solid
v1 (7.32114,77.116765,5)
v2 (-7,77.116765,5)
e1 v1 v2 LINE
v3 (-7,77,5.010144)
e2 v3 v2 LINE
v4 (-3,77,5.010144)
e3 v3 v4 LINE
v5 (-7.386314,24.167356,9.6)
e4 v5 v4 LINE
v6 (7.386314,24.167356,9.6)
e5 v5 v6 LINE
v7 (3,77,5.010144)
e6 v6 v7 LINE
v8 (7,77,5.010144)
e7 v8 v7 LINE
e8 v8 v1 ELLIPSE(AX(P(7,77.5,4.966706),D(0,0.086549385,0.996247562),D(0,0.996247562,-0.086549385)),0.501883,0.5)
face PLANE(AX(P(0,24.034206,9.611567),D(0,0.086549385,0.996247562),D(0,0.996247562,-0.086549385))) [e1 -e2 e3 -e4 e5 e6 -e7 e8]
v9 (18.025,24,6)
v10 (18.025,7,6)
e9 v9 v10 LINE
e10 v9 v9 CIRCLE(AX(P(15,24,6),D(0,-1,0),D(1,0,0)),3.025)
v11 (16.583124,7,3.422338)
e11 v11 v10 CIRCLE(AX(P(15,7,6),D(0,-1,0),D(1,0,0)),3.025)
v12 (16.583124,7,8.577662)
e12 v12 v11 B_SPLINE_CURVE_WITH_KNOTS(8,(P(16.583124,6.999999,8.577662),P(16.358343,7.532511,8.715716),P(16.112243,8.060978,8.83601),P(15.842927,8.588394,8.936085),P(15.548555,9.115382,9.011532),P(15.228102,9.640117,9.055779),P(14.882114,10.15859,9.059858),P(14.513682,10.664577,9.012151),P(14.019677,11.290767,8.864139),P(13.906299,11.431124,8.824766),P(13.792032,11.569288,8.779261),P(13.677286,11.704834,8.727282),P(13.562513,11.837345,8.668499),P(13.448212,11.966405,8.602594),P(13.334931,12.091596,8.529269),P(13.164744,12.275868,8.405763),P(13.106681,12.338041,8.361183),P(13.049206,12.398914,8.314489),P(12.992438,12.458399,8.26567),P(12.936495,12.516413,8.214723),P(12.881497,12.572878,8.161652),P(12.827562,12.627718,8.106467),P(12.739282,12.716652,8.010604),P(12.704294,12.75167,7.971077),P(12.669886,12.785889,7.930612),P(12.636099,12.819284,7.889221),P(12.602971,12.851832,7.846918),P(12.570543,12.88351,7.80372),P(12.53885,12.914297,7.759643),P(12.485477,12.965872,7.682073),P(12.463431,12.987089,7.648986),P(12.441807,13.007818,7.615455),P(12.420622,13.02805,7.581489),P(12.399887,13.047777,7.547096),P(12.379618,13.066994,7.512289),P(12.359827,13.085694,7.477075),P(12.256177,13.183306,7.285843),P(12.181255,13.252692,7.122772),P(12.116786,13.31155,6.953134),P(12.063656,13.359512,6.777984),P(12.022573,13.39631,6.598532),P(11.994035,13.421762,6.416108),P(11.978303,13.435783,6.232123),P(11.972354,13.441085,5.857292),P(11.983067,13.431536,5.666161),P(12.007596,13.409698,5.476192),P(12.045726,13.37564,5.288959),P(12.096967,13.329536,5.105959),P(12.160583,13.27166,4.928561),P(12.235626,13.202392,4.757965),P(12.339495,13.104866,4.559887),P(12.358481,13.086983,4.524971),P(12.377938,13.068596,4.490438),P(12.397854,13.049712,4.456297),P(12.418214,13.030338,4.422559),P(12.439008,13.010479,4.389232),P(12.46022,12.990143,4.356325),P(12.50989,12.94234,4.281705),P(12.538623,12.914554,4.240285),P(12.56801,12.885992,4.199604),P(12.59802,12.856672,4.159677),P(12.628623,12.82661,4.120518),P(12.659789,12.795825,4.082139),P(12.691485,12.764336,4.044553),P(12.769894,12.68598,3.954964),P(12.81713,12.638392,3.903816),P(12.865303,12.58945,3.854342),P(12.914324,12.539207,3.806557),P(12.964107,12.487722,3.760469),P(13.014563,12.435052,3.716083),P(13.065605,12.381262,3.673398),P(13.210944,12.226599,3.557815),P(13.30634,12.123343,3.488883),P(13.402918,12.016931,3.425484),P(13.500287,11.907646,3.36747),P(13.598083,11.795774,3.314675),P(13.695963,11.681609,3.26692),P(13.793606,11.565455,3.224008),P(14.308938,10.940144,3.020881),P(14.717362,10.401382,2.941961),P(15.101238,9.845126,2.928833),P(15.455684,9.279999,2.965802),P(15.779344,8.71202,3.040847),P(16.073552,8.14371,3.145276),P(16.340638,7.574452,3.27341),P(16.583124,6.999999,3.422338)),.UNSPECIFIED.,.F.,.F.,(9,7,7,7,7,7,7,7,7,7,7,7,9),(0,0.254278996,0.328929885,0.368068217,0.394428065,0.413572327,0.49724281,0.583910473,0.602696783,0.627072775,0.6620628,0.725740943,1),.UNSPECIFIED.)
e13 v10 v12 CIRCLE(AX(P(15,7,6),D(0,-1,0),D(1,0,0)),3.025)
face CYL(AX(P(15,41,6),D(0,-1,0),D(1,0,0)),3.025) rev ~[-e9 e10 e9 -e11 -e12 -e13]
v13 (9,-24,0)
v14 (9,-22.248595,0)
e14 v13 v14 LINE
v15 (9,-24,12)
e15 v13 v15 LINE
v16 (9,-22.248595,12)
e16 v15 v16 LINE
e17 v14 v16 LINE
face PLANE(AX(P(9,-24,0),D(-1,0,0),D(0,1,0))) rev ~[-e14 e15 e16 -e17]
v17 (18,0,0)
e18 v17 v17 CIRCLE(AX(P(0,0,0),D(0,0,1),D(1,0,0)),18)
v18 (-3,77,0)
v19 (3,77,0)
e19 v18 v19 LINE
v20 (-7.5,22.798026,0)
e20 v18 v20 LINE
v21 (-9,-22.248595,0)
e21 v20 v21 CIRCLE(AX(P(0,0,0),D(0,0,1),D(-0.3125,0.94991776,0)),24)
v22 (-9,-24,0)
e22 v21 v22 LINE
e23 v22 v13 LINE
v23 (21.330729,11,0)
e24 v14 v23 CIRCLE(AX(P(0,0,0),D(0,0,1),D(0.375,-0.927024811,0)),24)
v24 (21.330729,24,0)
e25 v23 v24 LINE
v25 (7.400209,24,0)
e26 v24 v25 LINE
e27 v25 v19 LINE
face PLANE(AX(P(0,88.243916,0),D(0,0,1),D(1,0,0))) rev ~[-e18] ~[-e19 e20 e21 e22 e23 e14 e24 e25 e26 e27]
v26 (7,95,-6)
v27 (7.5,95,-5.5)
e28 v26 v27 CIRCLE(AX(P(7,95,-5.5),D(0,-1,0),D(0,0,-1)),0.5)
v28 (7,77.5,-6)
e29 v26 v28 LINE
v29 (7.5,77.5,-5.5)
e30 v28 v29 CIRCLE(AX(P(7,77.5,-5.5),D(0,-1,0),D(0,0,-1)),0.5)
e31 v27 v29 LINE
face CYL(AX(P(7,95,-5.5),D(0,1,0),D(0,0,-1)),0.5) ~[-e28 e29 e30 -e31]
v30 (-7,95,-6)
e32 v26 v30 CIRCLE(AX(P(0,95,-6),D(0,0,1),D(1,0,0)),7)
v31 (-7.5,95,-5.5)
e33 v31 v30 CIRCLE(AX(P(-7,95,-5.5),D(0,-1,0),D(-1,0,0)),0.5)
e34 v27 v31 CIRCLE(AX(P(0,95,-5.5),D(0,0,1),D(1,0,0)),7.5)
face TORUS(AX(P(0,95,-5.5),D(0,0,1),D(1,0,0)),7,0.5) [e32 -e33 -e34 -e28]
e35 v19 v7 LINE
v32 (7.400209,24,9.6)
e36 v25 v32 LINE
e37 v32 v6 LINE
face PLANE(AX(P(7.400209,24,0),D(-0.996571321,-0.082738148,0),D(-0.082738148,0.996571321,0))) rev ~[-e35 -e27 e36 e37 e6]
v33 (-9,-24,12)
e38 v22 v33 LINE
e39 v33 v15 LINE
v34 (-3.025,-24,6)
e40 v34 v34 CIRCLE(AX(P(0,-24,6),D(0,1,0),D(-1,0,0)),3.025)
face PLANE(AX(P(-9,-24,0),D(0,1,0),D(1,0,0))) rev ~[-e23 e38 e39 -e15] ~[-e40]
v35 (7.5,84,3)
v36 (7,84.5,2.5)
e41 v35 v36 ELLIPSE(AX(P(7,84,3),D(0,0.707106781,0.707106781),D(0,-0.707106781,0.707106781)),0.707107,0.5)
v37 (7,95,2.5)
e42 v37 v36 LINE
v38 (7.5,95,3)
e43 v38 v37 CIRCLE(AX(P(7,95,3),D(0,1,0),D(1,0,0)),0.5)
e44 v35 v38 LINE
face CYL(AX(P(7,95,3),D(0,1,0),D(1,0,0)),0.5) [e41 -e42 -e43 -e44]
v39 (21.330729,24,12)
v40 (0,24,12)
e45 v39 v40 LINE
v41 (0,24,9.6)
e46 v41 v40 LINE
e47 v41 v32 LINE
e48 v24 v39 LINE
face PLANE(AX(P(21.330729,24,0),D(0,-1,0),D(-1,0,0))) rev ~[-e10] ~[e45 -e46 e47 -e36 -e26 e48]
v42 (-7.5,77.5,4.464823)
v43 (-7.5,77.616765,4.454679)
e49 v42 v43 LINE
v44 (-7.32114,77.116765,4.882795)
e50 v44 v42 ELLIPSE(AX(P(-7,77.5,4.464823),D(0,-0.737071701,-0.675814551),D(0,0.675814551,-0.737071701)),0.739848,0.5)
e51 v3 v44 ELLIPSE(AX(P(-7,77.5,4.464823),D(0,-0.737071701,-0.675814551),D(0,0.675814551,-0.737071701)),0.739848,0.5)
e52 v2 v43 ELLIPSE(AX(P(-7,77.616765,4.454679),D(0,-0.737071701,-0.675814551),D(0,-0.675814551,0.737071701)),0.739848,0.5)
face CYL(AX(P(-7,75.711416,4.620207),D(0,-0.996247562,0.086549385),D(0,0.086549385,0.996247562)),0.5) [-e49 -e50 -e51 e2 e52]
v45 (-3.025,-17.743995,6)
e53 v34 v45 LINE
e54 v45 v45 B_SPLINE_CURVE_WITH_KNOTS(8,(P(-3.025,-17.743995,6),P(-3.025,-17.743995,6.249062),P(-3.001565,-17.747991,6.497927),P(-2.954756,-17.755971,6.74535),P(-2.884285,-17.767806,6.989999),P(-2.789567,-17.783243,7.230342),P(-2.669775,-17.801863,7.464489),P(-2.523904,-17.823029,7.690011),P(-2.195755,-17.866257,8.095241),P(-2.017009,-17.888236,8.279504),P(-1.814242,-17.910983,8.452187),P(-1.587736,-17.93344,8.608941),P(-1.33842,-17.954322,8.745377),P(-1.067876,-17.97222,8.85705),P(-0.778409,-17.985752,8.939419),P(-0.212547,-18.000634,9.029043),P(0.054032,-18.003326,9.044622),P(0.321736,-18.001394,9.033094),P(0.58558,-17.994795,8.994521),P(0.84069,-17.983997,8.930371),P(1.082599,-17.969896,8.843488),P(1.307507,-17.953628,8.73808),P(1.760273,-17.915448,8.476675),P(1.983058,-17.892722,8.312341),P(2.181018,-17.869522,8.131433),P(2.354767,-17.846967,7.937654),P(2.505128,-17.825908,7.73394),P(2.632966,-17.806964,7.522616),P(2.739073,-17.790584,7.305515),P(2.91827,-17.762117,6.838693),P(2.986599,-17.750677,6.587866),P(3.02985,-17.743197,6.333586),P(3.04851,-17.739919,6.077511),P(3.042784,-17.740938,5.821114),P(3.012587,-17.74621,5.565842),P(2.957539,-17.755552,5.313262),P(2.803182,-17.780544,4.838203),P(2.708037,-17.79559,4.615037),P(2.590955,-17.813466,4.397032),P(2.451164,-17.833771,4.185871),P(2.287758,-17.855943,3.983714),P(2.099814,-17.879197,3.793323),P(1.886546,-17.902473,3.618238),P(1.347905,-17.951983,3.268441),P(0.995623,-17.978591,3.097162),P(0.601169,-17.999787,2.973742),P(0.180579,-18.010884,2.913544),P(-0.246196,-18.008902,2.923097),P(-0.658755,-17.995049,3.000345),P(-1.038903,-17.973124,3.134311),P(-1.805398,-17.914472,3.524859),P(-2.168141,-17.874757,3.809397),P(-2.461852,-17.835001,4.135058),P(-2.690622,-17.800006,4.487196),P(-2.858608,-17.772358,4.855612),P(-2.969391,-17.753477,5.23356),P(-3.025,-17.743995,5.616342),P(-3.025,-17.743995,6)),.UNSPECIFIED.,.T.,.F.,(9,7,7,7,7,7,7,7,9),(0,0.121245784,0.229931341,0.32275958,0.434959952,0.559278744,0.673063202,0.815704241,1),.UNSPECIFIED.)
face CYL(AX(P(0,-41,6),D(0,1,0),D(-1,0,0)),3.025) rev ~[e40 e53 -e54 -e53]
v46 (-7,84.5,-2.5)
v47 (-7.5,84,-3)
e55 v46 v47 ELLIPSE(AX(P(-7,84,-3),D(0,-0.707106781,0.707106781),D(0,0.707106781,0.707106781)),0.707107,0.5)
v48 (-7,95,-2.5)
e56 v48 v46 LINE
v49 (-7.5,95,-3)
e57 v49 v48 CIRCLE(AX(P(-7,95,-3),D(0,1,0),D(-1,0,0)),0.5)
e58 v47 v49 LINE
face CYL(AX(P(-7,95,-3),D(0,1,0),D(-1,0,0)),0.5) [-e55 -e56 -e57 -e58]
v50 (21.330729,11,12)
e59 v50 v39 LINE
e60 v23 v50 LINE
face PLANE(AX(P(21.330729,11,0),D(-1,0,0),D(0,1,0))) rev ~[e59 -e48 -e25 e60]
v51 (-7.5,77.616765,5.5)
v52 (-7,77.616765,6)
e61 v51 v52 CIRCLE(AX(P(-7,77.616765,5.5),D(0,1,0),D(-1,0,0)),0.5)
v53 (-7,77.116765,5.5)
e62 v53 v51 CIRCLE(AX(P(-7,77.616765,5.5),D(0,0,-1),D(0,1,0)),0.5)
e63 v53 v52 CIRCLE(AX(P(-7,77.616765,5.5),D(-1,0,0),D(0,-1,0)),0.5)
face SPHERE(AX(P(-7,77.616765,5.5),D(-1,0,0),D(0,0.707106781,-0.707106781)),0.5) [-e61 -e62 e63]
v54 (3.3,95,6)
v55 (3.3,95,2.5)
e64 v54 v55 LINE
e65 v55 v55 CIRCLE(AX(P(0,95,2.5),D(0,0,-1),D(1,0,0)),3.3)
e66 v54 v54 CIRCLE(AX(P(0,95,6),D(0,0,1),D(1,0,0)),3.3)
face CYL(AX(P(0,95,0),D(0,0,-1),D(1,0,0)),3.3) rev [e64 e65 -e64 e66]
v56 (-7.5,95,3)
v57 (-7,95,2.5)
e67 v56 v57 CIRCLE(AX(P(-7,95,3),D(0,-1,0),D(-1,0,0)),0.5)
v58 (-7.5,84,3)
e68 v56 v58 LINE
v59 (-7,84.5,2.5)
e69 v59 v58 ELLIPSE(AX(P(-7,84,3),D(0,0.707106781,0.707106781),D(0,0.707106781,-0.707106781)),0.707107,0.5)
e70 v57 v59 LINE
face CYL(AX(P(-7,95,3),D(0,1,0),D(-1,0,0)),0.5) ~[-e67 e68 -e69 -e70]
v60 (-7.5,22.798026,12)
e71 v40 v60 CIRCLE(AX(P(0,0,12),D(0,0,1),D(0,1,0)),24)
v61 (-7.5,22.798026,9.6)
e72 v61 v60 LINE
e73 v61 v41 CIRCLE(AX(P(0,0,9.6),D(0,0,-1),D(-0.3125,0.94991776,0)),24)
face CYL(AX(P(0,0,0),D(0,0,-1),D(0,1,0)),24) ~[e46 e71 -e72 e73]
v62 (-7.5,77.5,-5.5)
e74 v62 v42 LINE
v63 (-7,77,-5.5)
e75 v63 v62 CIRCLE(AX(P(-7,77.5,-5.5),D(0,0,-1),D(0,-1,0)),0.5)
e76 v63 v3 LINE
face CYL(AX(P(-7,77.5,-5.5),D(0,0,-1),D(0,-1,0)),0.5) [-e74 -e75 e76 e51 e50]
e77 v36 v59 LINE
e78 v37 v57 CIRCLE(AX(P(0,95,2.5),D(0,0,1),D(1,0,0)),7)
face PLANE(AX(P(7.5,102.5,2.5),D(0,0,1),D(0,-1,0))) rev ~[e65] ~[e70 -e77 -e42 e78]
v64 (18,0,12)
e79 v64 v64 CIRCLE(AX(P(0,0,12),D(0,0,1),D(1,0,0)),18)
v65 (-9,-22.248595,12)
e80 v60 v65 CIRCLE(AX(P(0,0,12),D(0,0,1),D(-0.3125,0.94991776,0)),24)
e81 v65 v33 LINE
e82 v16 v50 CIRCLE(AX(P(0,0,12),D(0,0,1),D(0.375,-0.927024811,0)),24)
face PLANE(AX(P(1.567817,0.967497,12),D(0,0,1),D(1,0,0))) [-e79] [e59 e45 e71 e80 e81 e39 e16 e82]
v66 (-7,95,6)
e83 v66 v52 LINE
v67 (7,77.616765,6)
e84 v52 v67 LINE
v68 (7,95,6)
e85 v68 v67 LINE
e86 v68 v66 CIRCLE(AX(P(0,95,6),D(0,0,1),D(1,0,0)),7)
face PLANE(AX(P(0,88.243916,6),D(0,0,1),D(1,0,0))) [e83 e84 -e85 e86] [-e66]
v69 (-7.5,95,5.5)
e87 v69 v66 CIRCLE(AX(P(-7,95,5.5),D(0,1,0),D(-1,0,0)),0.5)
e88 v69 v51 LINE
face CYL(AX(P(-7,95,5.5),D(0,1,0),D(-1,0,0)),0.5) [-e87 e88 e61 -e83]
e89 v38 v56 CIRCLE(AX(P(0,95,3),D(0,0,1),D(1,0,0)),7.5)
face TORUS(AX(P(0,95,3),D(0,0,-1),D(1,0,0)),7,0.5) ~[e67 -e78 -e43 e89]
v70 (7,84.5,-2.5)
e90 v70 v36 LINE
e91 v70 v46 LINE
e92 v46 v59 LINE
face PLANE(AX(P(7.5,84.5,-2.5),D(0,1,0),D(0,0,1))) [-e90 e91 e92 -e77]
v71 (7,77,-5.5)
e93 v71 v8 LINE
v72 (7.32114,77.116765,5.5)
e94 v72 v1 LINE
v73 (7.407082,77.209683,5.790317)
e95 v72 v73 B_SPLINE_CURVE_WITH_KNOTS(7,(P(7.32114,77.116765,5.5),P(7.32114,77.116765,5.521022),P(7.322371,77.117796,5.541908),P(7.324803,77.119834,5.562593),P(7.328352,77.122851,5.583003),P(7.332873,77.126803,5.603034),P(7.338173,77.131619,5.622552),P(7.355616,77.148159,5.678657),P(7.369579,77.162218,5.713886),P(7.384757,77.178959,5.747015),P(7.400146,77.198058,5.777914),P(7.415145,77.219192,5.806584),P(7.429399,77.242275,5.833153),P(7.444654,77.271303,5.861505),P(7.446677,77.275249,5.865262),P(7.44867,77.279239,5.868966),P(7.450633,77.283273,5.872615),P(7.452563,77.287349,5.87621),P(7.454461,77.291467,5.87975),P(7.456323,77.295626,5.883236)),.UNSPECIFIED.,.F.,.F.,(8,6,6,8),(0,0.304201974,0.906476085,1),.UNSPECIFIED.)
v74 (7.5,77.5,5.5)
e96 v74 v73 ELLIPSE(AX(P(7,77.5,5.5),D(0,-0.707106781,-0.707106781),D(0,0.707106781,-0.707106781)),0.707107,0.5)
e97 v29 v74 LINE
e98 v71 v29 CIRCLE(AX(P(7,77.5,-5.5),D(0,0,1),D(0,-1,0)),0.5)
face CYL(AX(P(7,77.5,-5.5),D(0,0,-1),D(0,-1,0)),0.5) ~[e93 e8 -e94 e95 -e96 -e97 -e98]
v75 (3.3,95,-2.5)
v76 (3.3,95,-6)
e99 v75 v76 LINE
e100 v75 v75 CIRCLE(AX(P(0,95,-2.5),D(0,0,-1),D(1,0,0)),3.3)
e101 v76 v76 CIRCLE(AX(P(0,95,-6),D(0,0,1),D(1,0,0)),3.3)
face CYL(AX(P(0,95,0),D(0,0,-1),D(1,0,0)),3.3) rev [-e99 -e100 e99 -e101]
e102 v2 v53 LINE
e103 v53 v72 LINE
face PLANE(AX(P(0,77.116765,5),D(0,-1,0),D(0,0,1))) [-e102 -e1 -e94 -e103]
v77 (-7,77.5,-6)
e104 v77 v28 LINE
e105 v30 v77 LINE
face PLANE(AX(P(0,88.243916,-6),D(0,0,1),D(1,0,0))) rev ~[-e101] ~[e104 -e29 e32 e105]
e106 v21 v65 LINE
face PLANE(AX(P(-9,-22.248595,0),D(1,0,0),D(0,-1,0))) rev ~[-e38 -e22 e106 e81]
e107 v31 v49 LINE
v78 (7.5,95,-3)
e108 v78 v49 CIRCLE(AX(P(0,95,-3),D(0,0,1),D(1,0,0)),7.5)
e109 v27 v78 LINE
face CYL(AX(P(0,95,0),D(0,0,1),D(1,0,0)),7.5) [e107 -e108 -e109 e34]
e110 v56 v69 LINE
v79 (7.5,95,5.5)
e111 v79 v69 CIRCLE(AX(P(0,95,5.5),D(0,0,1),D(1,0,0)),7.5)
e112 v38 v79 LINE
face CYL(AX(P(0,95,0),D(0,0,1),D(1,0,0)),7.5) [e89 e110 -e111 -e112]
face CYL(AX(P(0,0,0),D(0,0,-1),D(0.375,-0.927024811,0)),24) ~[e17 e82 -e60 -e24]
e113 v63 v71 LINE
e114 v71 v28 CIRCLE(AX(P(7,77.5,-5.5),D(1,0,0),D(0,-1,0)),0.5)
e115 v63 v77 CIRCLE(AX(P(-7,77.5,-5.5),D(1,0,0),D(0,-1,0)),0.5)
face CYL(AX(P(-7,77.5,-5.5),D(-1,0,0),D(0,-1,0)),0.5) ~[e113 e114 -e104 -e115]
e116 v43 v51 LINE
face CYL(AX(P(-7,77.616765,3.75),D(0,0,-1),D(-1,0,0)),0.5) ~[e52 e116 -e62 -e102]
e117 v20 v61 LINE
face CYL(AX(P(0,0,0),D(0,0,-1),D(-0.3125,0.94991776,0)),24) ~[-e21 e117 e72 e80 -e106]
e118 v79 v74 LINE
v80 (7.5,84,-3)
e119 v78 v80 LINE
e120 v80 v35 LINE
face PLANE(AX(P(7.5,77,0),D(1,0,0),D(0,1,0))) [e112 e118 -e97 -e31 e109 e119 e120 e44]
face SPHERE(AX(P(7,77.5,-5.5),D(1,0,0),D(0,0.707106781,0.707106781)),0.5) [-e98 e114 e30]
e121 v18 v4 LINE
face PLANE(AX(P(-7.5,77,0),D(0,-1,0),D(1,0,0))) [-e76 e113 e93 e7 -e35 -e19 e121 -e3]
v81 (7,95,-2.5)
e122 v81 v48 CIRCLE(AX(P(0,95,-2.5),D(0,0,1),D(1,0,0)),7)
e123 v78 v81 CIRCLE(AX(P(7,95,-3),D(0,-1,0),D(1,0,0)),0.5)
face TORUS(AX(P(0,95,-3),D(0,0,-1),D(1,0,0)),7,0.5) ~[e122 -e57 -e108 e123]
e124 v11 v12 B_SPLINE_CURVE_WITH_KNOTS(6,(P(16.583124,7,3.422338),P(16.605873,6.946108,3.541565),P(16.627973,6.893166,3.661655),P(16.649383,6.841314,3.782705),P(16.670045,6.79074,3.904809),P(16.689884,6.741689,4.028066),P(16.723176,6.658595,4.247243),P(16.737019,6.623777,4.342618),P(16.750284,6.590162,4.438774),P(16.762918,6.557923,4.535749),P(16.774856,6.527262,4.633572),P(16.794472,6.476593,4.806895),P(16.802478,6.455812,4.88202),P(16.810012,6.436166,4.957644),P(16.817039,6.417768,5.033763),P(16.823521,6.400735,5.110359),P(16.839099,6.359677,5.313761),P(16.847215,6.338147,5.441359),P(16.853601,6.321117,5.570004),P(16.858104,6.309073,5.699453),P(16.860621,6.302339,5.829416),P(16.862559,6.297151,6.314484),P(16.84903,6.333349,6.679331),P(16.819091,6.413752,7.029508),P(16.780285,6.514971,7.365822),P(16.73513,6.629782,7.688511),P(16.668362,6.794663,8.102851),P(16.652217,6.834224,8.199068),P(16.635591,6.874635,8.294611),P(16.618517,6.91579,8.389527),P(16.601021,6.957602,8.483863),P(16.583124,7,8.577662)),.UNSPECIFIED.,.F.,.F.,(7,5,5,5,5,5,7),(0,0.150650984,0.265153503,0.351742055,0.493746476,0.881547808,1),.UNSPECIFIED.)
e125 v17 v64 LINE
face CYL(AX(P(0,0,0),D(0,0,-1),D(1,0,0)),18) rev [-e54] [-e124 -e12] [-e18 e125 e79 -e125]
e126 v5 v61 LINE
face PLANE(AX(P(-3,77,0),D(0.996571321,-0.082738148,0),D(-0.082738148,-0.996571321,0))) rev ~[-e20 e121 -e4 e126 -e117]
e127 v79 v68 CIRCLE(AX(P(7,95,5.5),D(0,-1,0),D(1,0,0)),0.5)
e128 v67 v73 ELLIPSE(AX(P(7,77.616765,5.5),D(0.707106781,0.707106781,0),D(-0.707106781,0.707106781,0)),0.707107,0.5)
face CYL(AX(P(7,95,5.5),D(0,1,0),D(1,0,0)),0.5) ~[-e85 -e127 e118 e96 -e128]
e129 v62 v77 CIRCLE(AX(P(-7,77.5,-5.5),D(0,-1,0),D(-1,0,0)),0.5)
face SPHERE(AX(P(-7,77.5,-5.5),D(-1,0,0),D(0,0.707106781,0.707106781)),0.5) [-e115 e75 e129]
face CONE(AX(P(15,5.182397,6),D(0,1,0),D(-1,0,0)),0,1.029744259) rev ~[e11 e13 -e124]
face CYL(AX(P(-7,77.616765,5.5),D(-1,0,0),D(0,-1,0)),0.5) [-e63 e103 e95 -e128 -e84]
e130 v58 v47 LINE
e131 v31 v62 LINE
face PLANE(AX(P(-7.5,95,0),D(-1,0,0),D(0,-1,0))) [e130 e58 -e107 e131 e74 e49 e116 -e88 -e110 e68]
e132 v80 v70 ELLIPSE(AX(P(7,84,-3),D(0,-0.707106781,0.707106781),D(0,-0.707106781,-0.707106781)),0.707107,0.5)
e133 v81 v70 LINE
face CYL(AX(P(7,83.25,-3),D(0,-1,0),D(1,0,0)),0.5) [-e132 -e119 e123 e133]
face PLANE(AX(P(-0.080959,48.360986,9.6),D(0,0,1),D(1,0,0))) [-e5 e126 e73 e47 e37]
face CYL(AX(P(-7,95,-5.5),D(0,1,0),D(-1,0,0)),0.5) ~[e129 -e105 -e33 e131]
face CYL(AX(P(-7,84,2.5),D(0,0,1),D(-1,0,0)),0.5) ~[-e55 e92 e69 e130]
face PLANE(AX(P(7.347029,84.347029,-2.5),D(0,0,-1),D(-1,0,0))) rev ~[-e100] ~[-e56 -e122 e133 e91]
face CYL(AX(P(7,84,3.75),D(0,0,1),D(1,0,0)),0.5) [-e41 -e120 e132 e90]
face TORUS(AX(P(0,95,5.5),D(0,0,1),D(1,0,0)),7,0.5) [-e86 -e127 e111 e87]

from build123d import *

# Parameters (mm, degrees)
F0_R           = 18
F1_DEPTH       = 12
F2_DEPTH       = 9.6
F0_R_2         = 3.3
F3_DEPTH       = 6
F3_DEPTH_BACK  = 6
F5_DEPTH       = 25
F5_DEPTH_BACK  = 25
F6_W           = 10.5
F6_H           = 5
F6_W_2         = 7.5
F7_DEPTH       = 25
F9_D           = 5
F9_DEPTH       = 17
F9_TIP         = 1.5021515476
F11_D          = 5
F11_DEPTH      = 17
F11_TIP        = 1.5021515476
F12_D          = 6.05
F12_DEPTH      = 17
F12_TIP        = 1.8176033726
F13_D          = 6.05
F13_DEPTH      = 17
F13_TIP        = 1.8176033726
F14_T1_DEPTH   = 5
F14_T3_DEPTH   = 10.5
F14_T5_DEPTH   = 17.5
F14_T7_DEPTH   = 11.7601440108
F14_T9_DEPTH   = 17.3832349181
F14_T11_DEPTH  = 14
F14_T13_DEPTH  = 19.1332349181
F14_T15_DEPTH  = 15.75
F14_S19_W      = 0.5
F14_S19_H      = 0.5
F14_T20_DEPTH  = 0.5
F14_S25_W      = 0.5
F14_S25_H      = 0.5
F14_T26_DEPTH  = 0.5
F14_S31_W      = 0.5
F14_S31_H      = 0.5
F14_T32_DEPTH  = 0.5
F14_T36_ANGLE  = 180
F14_T38_ANGLE  = 180
F14_T40_ANGLE  = 180
F14_T42_ANGLE  = 180
F14_T46_DEPTH  = 2.617204886
F14_T51_DEPTH  = 1.75
F14_T57_DEPTH  = 11.75
F14_T61_DEPTH  = 6.25
F14_T68_DEPTH  = 6.25
F14_T72_DEPTH  = 11.75
F14_T79_DEPTH  = 2.617204886
F14_T83_DEPTH  = 1.75
F14_T90_DEPTH  = 6.25
F14_T94_DEPTH  = 11.75
F14_T101_DEPTH = 11.75
F14_T105_DEPTH = 6.25


# Not quite as in the source:
# - a fillet or chamfer that OpenCascade refuses, or shapes differently, is made with other operations: its cross-section is extruded or revolved along the edge and cut away or added


with BuildPart() as f1:
    # F0 (on Top) → F1 (new body)
    with BuildSketch(Plane.XY):
        with BuildLine():
            Line((9, -24), (9, -22.2485954613))
            ThreePointArc((9, -22.2485954613), (22.5023455571, -8.3453247048), (21.3307290077, 11))
            Line((21.3307290077, 11), (21.3307290077, 24))
            Line((21.3307290077, 24), (7.4002087639, 24))
            Line((7.4002087639, 24), (0, 24))
            ThreePointArc((0, 24), (-3.7978527138, 23.6976014559), (-7.5, 22.7980262304))
            ThreePointArc((-7.5, 22.7980262304), (-23.9867053064, 0.7987293299), (-9, -22.2485954613))
            Line((-9, -22.2485954613), (-9, -24))
            Line((-9, -24), (9, -24))
        make_face()
        Circle(F0_R, mode=Mode.SUBTRACT)
    extrude(amount=F1_DEPTH)

    # F0 (on Top) → F2 (join)
    with BuildSketch(Plane.XY):
        with BuildLine():
            Line((0, 24), (7.4002087639, 24))
            Line((7.4002087639, 24), (3, 77))
            Line((3, 77), (-3, 77))
            Line((-3, 77), (-7.5, 22.7980262304))
            ThreePointArc((-7.5, 22.7980262304), (-3.7978527138, 23.6976014559), (0, 24))
        make_face()
    extrude(amount=F2_DEPTH)

    # F0 (on Top) → F3 (join, two sides)
    with BuildSketch(Plane.XY) as f3_sk:
        with BuildLine():
            Line((-3, 77), (3, 77))
            Line((3, 77), (7.5, 77))
            Line((7.5, 77), (7.5, 95))
            ThreePointArc((7.5, 95), (0, 102.5), (-7.5, 95))
            Line((-7.5, 95), (-7.5, 77))
            Line((-7.5, 77), (-3, 77))
        make_face()
        with Locations((0, 95)):
            Circle(F0_R_2, mode=Mode.SUBTRACT)
    extrude(amount=F3_DEPTH)
    extrude(f3_sk.sketch, amount=-F3_DEPTH_BACK)

    # F4 (on Right) → F5 (cut, two sides)
    with BuildSketch(Plane.YZ) as f5_sk:
        Polygon((24.0342058241, 9.6115674824), (77.1167650819, 5), (77.1167650819, 9.6115674824), align=None)
    extrude(amount=-F5_DEPTH, mode=Mode.SUBTRACT)
    extrude(f5_sk.sketch, amount=F5_DEPTH_BACK, mode=Mode.SUBTRACT)

    # F6 (on face) → F7 (cut)
    with BuildSketch(Plane.YZ.offset(7.5)):
        with Locations((89.75, 0)):
            Rectangle(F6_W, F6_H)
        with Locations((98.75, 0)):
            Rectangle(F6_W_2, F6_H)
    extrude(amount=-F7_DEPTH, mode=Mode.SUBTRACT)

    # F9
    with Locations(Plane.XZ.offset(24)):
        with Locations((0, 6)):
            Hole(F9_D / 2, depth=F9_DEPTH)
            with Locations((0, 0, -(F9_DEPTH + F9_TIP / 2))):  # 118° drill point
                Cone(0, F9_D / 2, F9_TIP, mode=Mode.SUBTRACT)

    # F11
    with Locations(Plane(origin=(0, 24, 0), x_dir=(-1, 0, 0), z_dir=(0, 1, 0))):
        with Locations((-15, 6)):
            Hole(F11_D / 2, depth=F11_DEPTH)
            with Locations((0, 0, -(F11_DEPTH + F11_TIP / 2))):  # 118° drill point
                Cone(0, F11_D / 2, F11_TIP, mode=Mode.SUBTRACT)

    # F12
    with Locations(Plane(origin=(0, 24, 0), x_dir=(-1, 0, 0), z_dir=(0, 1, 0))):
        with Locations((-15, 6)):
            Hole(F12_D / 2, depth=F12_DEPTH)
            with Locations((0, 0, -(F12_DEPTH + F12_TIP / 2))):  # 118° drill point
                Cone(0, F12_D / 2, F12_TIP, mode=Mode.SUBTRACT)

    # F13
    with Locations(Plane.XZ.offset(24)):
        with Locations((0, 6)):
            Hole(F13_D / 2, depth=F13_DEPTH)
            with Locations((0, 0, -(F13_DEPTH + F13_TIP / 2))):  # 118° drill point
                Cone(0, F13_D / 2, F13_TIP, mode=Mode.SUBTRACT)

    # F14: fillet of radius 0.5 on 22 edges, made by hand

    # F14_s2 → F14_t1 (cut)
    with BuildSketch(Plane.XY.offset(-2.5)):
        with BuildLine():
            ThreePointArc((-7.5, 84), (-7.3535533906, 84.3535533906), (-7, 84.5))
            Line((-7, 84.5), (-7.5, 84.5))
            Line((-7.5, 84.5), (-7.5, 84))
        make_face()
        with BuildLine():
            ThreePointArc((7.5, 84), (7.3535533906, 84.3535533906), (7, 84.5))
            Line((7, 84.5), (7.5, 84.5))
            Line((7.5, 84.5), (7.5, 84))
        make_face()
    extrude(amount=F14_T1_DEPTH, mode=Mode.SUBTRACT)

    # F14_s4 → F14_t3 (cut)
    with BuildSketch(Plane.XZ.offset(-95)):
        with BuildLine():
            ThreePointArc((-7.5, 3), (-7.3535533906, 2.6464466094), (-7, 2.5))
            Line((-7, 2.5), (-7.5, 2.5))
            Line((-7.5, 2.5), (-7.5, 3))
        make_face()
        with BuildLine():
            ThreePointArc((-7.5, -3), (-7.3535533906, -2.6464466094), (-7, -2.5))
            Line((-7, -2.5), (-7.5, -2.5))
            Line((-7.5, -2.5), (-7.5, -3))
        make_face()
        with BuildLine():
            ThreePointArc((7.5, -3), (7.3535533906, -2.6464466094), (7, -2.5))
            Line((7, -2.5), (7.5, -2.5))
            Line((7.5, -2.5), (7.5, -3))
        make_face()
        with BuildLine():
            ThreePointArc((7.5, 3), (7.3535533906, 2.6464466094), (7, 2.5))
            Line((7, 2.5), (7.5, 2.5))
            Line((7.5, 2.5), (7.5, 3))
        make_face()
    extrude(amount=F14_T3_DEPTH, mode=Mode.SUBTRACT)

    # F14_s6 → F14_t5 (cut)
    with BuildSketch(Plane.XZ.offset(-95)):
        with BuildLine():
            ThreePointArc((-7.5, -5.5), (-7.3535533906, -5.8535533906), (-7, -6))
            Line((-7, -6), (-7.5, -6))
            Line((-7.5, -6), (-7.5, -5.5))
        make_face()
        with BuildLine():
            ThreePointArc((7, -6), (7.3535533906, -5.8535533906), (7.5, -5.5))
            Line((7.5, -5.5), (7.5, -6))
            Line((7.5, -6), (7, -6))
        make_face()
    extrude(amount=F14_T5_DEPTH, mode=Mode.SUBTRACT)

    # F14_s8 → F14_t7 (cut)
    with BuildSketch(Plane.XY.offset(-5.5)):
        with BuildLine():
            ThreePointArc((-7, 77), (-7.3535533906, 77.1464466094), (-7.5, 77.5))
            Line((-7.5, 77.5), (-7.5, 77))
            Line((-7.5, 77), (-7, 77))
        make_face()
        with BuildLine():
            ThreePointArc((7, 77), (7.3535533906, 77.1464466094), (7.5, 77.5))
            Line((7.5, 77.5), (7.5, 77))
            Line((7.5, 77), (7, 77))
        make_face()
    extrude(amount=F14_T7_DEPTH, mode=Mode.SUBTRACT)

    # F14_s10 → F14_t9 (cut)
    with BuildSketch(Plane.XZ.offset(-95)):
        with BuildLine():
            ThreePointArc((-7.5, 5.5), (-7.3535533906, 5.8535533906), (-7, 6))
            Line((-7, 6), (-7.5, 6))
            Line((-7.5, 6), (-7.5, 5.5))
        make_face()
    extrude(amount=F14_T9_DEPTH, mode=Mode.SUBTRACT)

    # F14_s12 → F14_t11 (cut)
    with BuildSketch(Plane.YZ.offset(-7)):
        with BuildLine():
            ThreePointArc((77, -5.5), (77.1464466094, -5.8535533906), (77.5, -6))
            Line((77.5, -6), (77, -6))
            Line((77, -6), (77, -5.5))
        make_face()
    extrude(amount=F14_T11_DEPTH, mode=Mode.SUBTRACT)

    # F14_s14 → F14_t13 (cut)
    with BuildSketch(Plane.XZ.offset(-95)):
        with BuildLine():
            ThreePointArc((7.5, 5.5), (7.3535533906, 5.8535533906), (7, 6))
            Line((7, 6), (7.5, 6))
            Line((7.5, 6), (7.5, 5.5))
        make_face()
    extrude(amount=F14_T13_DEPTH, mode=Mode.SUBTRACT)

    # F14_s16 → F14_t15 (cut)
    with BuildSketch(Plane.YZ.offset(-7)):
        with BuildLine():
            ThreePointArc((77.1167650819, 5.5), (77.2632116913, 5.8535533906), (77.6167650819, 6))
            Line((77.6167650819, 6), (77.1167650819, 6))
            Line((77.1167650819, 6), (77.1167650819, 5.5))
        make_face()
    extrude(amount=F14_T15_DEPTH, mode=Mode.SUBTRACT)


with BuildPart() as f14_tool18:
    # F14_s19 → F14_t20 (new body)
    with BuildSketch(Plane.YZ.offset(-7)):
        with Locations((77.25, -5.75)):
            Rectangle(F14_S19_W, F14_S19_H)
    extrude(amount=-F14_T20_DEPTH)

    # F14_s21 → F14_t22 (revolve, cut)
    with BuildSketch(Plane(origin=(-7, 77.5, -5.5), x_dir=(0, 0.7071067812, 0.7071067812), z_dir=(0, -0.7071067812, 0.7071067812))):
        with BuildLine():
            ThreePointArc((0, -0.5), (0.5, 0), (0, 0.5))
            Line((0, 0.5), (0, -0.5))
        make_face()
    revolve(axis=Axis((-7, 77.5, -5.5), (-1, 0, 0)), mode=Mode.SUBTRACT)


with BuildPart() as f1_1:
    add(f1.part)

    # F14_t17: cut F14_tool18
    add(f14_tool18.part, mode=Mode.SUBTRACT)


with BuildPart() as f14_tool24:
    # F14_s25 → F14_t26 (new body)
    with BuildSketch(Plane.YZ.offset(-7)):
        with Locations((77.3667650819, 5.75)):
            Rectangle(F14_S25_W, F14_S25_H)
    extrude(amount=-F14_T26_DEPTH)

    # F14_s27 → F14_t28 (revolve, cut)
    with BuildSketch(Plane(origin=(-7, 77.6167650819, 5.5), x_dir=(0, 0.7071067812, -0.7071067812), z_dir=(0, 0.7071067812, 0.7071067812))):
        with BuildLine():
            ThreePointArc((0, -0.5), (0.5, 0), (0, 0.5))
            Line((0, 0.5), (0, -0.5))
        make_face()
    revolve(axis=Axis((-7, 77.6167650819, 5.5), (-1, 0, 0)), mode=Mode.SUBTRACT)


with BuildPart() as f1_2:
    add(f1_1.part)

    # F14_t23: cut F14_tool24
    add(f14_tool24.part, mode=Mode.SUBTRACT)


with BuildPart() as f14_tool30:
    # F14_s31 → F14_t32 (new body)
    with BuildSketch(Plane.YZ.offset(7)):
        with Locations((77.25, -5.75)):
            Rectangle(F14_S31_W, F14_S31_H)
    extrude(amount=F14_T32_DEPTH)

    # F14_s33 → F14_t34 (revolve, cut)
    with BuildSketch(Plane(origin=(7, 77.5, -5.5), x_dir=(0, 0.7071067812, 0.7071067812), z_dir=(0, 0.7071067812, -0.7071067812))):
        with BuildLine():
            ThreePointArc((0, -0.5), (0.5, 0), (0, 0.5))
            Line((0, 0.5), (0, -0.5))
        make_face()
    revolve(axis=Axis((7, 77.5, -5.5), (1, 0, 0)), mode=Mode.SUBTRACT)


with BuildPart() as f1_3:
    add(f1_2.part)

    # F14_t29: cut F14_tool30
    add(f14_tool30.part, mode=Mode.SUBTRACT)

    # F14_s35 → F14_t36 (revolve, cut)
    with BuildSketch(Plane.XZ.offset(-95)):
        with BuildLine():
            ThreePointArc((7, -2.5), (7.3535533906, -2.6464466094), (7.5, -3))
            Line((7.5, -3), (7.5, -2.5))
            Line((7.5, -2.5), (7, -2.5))
        make_face()
    revolve(axis=Axis((0, 95, -2.5), (0, 0, 1)), revolution_arc=F14_T36_ANGLE, mode=Mode.SUBTRACT)

    # F14_s37 → F14_t38 (revolve, cut)
    with BuildSketch(Plane.XZ.offset(-95)):
        with BuildLine():
            ThreePointArc((7.5, 3), (7.3535533906, 2.6464466094), (7, 2.5))
            Line((7, 2.5), (7.5, 2.5))
            Line((7.5, 2.5), (7.5, 3))
        make_face()
    revolve(axis=Axis((0, 95, 2.5), (0, 0, 1)), revolution_arc=F14_T38_ANGLE, mode=Mode.SUBTRACT)

    # F14_s39 → F14_t40 (revolve, cut)
    with BuildSketch(Plane.XZ.offset(-95)):
        with BuildLine():
            ThreePointArc((7.5, 5.5), (7.3535533906, 5.8535533906), (7, 6))
            Line((7, 6), (7.5, 6))
            Line((7.5, 6), (7.5, 5.5))
        make_face()
    revolve(axis=Axis((0, 95, 6), (0, 0, 1)), revolution_arc=F14_T40_ANGLE, mode=Mode.SUBTRACT)

    # F14_s41 → F14_t42 (revolve, cut)
    with BuildSketch(Plane.XZ.offset(-95)):
        with BuildLine():
            ThreePointArc((7, -6), (7.3535533906, -5.8535533906), (7.5, -5.5))
            Line((7.5, -5.5), (7.5, -6))
            Line((7.5, -6), (7, -6))
        make_face()
    revolve(axis=Axis((0, 95, -6), (0, 0, 1)), revolution_arc=F14_T42_ANGLE, mode=Mode.SUBTRACT)


with BuildPart() as f14_tool44:
    # F14_s45 → F14_t46 (new body)
    with BuildSketch(Plane(origin=(0, 74.74590152, -6.4935785634), x_dir=(1, 0, 0), z_dir=(0, 0.9962475616, -0.086549385))):
        with BuildLine():
            ThreePointArc((-7, -11.6556464009), (-7.3535533906, -11.5091997915), (-7.5, -11.1556464009))
            Line((-7.5, -11.1556464009), (-7.5, -11.6556464009))
            Line((-7.5, -11.6556464009), (-7, -11.6556464009))
        make_face()
    extrude(amount=F14_T46_DEPTH)

    split(bisect_by=Plane.XZ.offset(-77.1167650819), keep=Keep.TOP)


with BuildPart() as f1_4:
    add(f1_3.part)

    # F14_t43: cut F14_tool44
    add(f14_tool44.part, mode=Mode.SUBTRACT)


with BuildPart() as f14_tool49:
    # F14_s50 → F14_t51 (new body)
    with BuildSketch(Plane.XY.offset(3.75)):
        with BuildLine():
            ThreePointArc((-7.5, 77.6167650819), (-7.3535533906, 77.2632116913), (-7, 77.1167650819))
            Line((-7, 77.1167650819), (-7.5, 77.1167650819))
            Line((-7.5, 77.1167650819), (-7.5, 77.6167650819))
        make_face()
    extrude(amount=F14_T51_DEPTH)

    split(bisect_by=Plane(origin=(0, 1.0087890281, 11.6119093055), x_dir=(1, 0, 0), z_dir=(0, 0.086549385, 0.9962475616)), keep=Keep.TOP)


with BuildPart() as f1_5:
    add(f1_4.part)

    # F14_t48: cut F14_tool49
    add(f14_tool49.part, mode=Mode.SUBTRACT)


with BuildPart() as f14_tool55:
    # F14_s56 → F14_t57 (new body)
    with BuildSketch(Plane.XZ.offset(-95)):
        with BuildLine():
            ThreePointArc((-7.5, 3), (-7.3535533906, 2.6464466094), (-7, 2.5))
            Line((-7, 2.5), (-7.5, 2.5))
            Line((-7.5, 2.5), (-7.5, 3))
        make_face()
    extrude(amount=F14_T57_DEPTH)

    split(bisect_by=Plane.XZ.offset(-84.5), keep=Keep.TOP)


with BuildPart() as f14_tool59:
    # F14_s60 → F14_t61 (new body)
    with BuildSketch(Plane.XY.offset(3.75)):
        with BuildLine():
            ThreePointArc((-7.5, 84), (-7.3535533906, 84.3535533906), (-7, 84.5))
            Line((-7, 84.5), (-7.5, 84.5))
            Line((-7.5, 84.5), (-7.5, 84))
        make_face()
    extrude(amount=-F14_T61_DEPTH)

    split(bisect_by=Plane.XY.offset(2.5), keep=Keep.TOP)


with BuildPart() as f14_tool55_1:
    add(f14_tool55.part)

    # F14_t63: intersect F14_tool59
    add(f14_tool59.part, mode=Mode.INTERSECT)


with BuildPart() as f1_6:
    add(f1_5.part)

    # F14_t53: cut F14_tool55
    add(f14_tool55_1.part, mode=Mode.SUBTRACT)


with BuildPart() as f14_tool66:
    # F14_s67 → F14_t68 (new body)
    with BuildSketch(Plane.XY.offset(2.5)):
        with BuildLine():
            ThreePointArc((-7.5, 84), (-7.3535533906, 84.3535533906), (-7, 84.5))
            Line((-7, 84.5), (-7.5, 84.5))
            Line((-7.5, 84.5), (-7.5, 84))
        make_face()
    extrude(amount=-F14_T68_DEPTH)

    split(bisect_by=Plane.XY.offset(-2.5), keep=Keep.BOTTOM)


with BuildPart() as f14_tool70:
    # F14_s71 → F14_t72 (new body)
    with BuildSketch(Plane.XZ.offset(-83.25)):
        with BuildLine():
            ThreePointArc((-7.5, -3), (-7.3535533906, -2.6464466094), (-7, -2.5))
            Line((-7, -2.5), (-7.5, -2.5))
            Line((-7.5, -2.5), (-7.5, -3))
        make_face()
    extrude(amount=-F14_T72_DEPTH)

    split(bisect_by=Plane.XZ.offset(-84.5), keep=Keep.TOP)


with BuildPart() as f14_tool66_1:
    add(f14_tool66.part)

    # F14_t74: intersect F14_tool70
    add(f14_tool70.part, mode=Mode.INTERSECT)


with BuildPart() as f1_7:
    add(f1_6.part)

    # F14_t64: cut F14_tool66
    add(f14_tool66_1.part, mode=Mode.SUBTRACT)


with BuildPart() as f14_tool77:
    # F14_s78 → F14_t79 (new body)
    with BuildSketch(Plane(origin=(0, 74.74590152, -6.4935785634), x_dir=(1, 0, 0), z_dir=(0, 0.9962475616, -0.086549385))):
        with BuildLine():
            ThreePointArc((-7, -11.6556464009), (-7.3535533906, -11.5091997915), (-7.5, -11.1556464009))
            Line((-7.5, -11.1556464009), (-7.5, -11.6556464009))
            Line((-7.5, -11.6556464009), (-7, -11.6556464009))
        make_face()
    extrude(amount=F14_T79_DEPTH)

    split(bisect_by=Plane.XZ.offset(-77.1167650819), keep=Keep.BOTTOM)


with BuildPart() as f14_tool81:
    # F14_s82 → F14_t83 (new body)
    with BuildSketch(Plane.XY.offset(3.75)):
        with BuildLine():
            ThreePointArc((-7.5, 77.6167650819), (-7.3535533906, 77.2632116913), (-7, 77.1167650819))
            Line((-7, 77.1167650819), (-7.5, 77.1167650819))
            Line((-7.5, 77.1167650819), (-7.5, 77.6167650819))
        make_face()
    extrude(amount=F14_T83_DEPTH)

    split(bisect_by=Plane(origin=(0, 1.0087890281, 11.6119093055), x_dir=(1, 0, 0), z_dir=(0, -0.086549385, -0.9962475616)), keep=Keep.TOP)


with BuildPart() as f14_tool77_1:
    add(f14_tool77.part)

    # F14_t85: intersect F14_tool81
    add(f14_tool81.part, mode=Mode.INTERSECT)


with BuildPart() as f1_8:
    add(f1_7.part)

    # F14_t75: cut F14_tool77
    add(f14_tool77_1.part, mode=Mode.SUBTRACT)


with BuildPart() as f14_tool88:
    # F14_s89 → F14_t90 (new body)
    with BuildSketch(Plane.XY.offset(3.75)):
        with BuildLine():
            ThreePointArc((7.5, 84), (7.3535533906, 84.3535533906), (7, 84.5))
            Line((7, 84.5), (7.5, 84.5))
            Line((7.5, 84.5), (7.5, 84))
        make_face()
    extrude(amount=-F14_T90_DEPTH)

    split(bisect_by=Plane.XY.offset(2.5), keep=Keep.TOP)


with BuildPart() as f14_tool92:
    # F14_s93 → F14_t94 (new body)
    with BuildSketch(Plane.XZ.offset(-95)):
        with BuildLine():
            ThreePointArc((7.5, 3), (7.3535533906, 2.6464466094), (7, 2.5))
            Line((7, 2.5), (7.5, 2.5))
            Line((7.5, 2.5), (7.5, 3))
        make_face()
    extrude(amount=F14_T94_DEPTH)

    split(bisect_by=Plane.XZ.offset(-84.5), keep=Keep.TOP)


with BuildPart() as f14_tool88_1:
    add(f14_tool88.part)

    # F14_t96: intersect F14_tool92
    add(f14_tool92.part, mode=Mode.INTERSECT)


with BuildPart() as f1_9:
    add(f1_8.part)

    # F14_t86: cut F14_tool88
    add(f14_tool88_1.part, mode=Mode.SUBTRACT)


with BuildPart() as f14_tool99:
    # F14_s100 → F14_t101 (new body)
    with BuildSketch(Plane.XZ.offset(-83.25)):
        with BuildLine():
            ThreePointArc((7.5, -3), (7.3535533906, -2.6464466094), (7, -2.5))
            Line((7, -2.5), (7.5, -2.5))
            Line((7.5, -2.5), (7.5, -3))
        make_face()
    extrude(amount=-F14_T101_DEPTH)

    split(bisect_by=Plane.XZ.offset(-84.5), keep=Keep.TOP)


with BuildPart() as f14_tool103:
    # F14_s104 → F14_t105 (new body)
    with BuildSketch(Plane.XY.offset(2.5)):
        with BuildLine():
            ThreePointArc((7.5, 84), (7.3535533906, 84.3535533906), (7, 84.5))
            Line((7, 84.5), (7.5, 84.5))
            Line((7.5, 84.5), (7.5, 84))
        make_face()
    extrude(amount=-F14_T105_DEPTH)

    split(bisect_by=Plane.XY.offset(-2.5), keep=Keep.BOTTOM)


with BuildPart() as f14_tool99_1:
    add(f14_tool99.part)

    # F14_t107: intersect F14_tool103
    add(f14_tool103.part, mode=Mode.INTERSECT)


with BuildPart() as f1_10:
    add(f1_9.part)

    # F14_t97: cut F14_tool99
    add(f14_tool99_1.part, mode=Mode.SUBTRACT)


solid = f1_10.part
